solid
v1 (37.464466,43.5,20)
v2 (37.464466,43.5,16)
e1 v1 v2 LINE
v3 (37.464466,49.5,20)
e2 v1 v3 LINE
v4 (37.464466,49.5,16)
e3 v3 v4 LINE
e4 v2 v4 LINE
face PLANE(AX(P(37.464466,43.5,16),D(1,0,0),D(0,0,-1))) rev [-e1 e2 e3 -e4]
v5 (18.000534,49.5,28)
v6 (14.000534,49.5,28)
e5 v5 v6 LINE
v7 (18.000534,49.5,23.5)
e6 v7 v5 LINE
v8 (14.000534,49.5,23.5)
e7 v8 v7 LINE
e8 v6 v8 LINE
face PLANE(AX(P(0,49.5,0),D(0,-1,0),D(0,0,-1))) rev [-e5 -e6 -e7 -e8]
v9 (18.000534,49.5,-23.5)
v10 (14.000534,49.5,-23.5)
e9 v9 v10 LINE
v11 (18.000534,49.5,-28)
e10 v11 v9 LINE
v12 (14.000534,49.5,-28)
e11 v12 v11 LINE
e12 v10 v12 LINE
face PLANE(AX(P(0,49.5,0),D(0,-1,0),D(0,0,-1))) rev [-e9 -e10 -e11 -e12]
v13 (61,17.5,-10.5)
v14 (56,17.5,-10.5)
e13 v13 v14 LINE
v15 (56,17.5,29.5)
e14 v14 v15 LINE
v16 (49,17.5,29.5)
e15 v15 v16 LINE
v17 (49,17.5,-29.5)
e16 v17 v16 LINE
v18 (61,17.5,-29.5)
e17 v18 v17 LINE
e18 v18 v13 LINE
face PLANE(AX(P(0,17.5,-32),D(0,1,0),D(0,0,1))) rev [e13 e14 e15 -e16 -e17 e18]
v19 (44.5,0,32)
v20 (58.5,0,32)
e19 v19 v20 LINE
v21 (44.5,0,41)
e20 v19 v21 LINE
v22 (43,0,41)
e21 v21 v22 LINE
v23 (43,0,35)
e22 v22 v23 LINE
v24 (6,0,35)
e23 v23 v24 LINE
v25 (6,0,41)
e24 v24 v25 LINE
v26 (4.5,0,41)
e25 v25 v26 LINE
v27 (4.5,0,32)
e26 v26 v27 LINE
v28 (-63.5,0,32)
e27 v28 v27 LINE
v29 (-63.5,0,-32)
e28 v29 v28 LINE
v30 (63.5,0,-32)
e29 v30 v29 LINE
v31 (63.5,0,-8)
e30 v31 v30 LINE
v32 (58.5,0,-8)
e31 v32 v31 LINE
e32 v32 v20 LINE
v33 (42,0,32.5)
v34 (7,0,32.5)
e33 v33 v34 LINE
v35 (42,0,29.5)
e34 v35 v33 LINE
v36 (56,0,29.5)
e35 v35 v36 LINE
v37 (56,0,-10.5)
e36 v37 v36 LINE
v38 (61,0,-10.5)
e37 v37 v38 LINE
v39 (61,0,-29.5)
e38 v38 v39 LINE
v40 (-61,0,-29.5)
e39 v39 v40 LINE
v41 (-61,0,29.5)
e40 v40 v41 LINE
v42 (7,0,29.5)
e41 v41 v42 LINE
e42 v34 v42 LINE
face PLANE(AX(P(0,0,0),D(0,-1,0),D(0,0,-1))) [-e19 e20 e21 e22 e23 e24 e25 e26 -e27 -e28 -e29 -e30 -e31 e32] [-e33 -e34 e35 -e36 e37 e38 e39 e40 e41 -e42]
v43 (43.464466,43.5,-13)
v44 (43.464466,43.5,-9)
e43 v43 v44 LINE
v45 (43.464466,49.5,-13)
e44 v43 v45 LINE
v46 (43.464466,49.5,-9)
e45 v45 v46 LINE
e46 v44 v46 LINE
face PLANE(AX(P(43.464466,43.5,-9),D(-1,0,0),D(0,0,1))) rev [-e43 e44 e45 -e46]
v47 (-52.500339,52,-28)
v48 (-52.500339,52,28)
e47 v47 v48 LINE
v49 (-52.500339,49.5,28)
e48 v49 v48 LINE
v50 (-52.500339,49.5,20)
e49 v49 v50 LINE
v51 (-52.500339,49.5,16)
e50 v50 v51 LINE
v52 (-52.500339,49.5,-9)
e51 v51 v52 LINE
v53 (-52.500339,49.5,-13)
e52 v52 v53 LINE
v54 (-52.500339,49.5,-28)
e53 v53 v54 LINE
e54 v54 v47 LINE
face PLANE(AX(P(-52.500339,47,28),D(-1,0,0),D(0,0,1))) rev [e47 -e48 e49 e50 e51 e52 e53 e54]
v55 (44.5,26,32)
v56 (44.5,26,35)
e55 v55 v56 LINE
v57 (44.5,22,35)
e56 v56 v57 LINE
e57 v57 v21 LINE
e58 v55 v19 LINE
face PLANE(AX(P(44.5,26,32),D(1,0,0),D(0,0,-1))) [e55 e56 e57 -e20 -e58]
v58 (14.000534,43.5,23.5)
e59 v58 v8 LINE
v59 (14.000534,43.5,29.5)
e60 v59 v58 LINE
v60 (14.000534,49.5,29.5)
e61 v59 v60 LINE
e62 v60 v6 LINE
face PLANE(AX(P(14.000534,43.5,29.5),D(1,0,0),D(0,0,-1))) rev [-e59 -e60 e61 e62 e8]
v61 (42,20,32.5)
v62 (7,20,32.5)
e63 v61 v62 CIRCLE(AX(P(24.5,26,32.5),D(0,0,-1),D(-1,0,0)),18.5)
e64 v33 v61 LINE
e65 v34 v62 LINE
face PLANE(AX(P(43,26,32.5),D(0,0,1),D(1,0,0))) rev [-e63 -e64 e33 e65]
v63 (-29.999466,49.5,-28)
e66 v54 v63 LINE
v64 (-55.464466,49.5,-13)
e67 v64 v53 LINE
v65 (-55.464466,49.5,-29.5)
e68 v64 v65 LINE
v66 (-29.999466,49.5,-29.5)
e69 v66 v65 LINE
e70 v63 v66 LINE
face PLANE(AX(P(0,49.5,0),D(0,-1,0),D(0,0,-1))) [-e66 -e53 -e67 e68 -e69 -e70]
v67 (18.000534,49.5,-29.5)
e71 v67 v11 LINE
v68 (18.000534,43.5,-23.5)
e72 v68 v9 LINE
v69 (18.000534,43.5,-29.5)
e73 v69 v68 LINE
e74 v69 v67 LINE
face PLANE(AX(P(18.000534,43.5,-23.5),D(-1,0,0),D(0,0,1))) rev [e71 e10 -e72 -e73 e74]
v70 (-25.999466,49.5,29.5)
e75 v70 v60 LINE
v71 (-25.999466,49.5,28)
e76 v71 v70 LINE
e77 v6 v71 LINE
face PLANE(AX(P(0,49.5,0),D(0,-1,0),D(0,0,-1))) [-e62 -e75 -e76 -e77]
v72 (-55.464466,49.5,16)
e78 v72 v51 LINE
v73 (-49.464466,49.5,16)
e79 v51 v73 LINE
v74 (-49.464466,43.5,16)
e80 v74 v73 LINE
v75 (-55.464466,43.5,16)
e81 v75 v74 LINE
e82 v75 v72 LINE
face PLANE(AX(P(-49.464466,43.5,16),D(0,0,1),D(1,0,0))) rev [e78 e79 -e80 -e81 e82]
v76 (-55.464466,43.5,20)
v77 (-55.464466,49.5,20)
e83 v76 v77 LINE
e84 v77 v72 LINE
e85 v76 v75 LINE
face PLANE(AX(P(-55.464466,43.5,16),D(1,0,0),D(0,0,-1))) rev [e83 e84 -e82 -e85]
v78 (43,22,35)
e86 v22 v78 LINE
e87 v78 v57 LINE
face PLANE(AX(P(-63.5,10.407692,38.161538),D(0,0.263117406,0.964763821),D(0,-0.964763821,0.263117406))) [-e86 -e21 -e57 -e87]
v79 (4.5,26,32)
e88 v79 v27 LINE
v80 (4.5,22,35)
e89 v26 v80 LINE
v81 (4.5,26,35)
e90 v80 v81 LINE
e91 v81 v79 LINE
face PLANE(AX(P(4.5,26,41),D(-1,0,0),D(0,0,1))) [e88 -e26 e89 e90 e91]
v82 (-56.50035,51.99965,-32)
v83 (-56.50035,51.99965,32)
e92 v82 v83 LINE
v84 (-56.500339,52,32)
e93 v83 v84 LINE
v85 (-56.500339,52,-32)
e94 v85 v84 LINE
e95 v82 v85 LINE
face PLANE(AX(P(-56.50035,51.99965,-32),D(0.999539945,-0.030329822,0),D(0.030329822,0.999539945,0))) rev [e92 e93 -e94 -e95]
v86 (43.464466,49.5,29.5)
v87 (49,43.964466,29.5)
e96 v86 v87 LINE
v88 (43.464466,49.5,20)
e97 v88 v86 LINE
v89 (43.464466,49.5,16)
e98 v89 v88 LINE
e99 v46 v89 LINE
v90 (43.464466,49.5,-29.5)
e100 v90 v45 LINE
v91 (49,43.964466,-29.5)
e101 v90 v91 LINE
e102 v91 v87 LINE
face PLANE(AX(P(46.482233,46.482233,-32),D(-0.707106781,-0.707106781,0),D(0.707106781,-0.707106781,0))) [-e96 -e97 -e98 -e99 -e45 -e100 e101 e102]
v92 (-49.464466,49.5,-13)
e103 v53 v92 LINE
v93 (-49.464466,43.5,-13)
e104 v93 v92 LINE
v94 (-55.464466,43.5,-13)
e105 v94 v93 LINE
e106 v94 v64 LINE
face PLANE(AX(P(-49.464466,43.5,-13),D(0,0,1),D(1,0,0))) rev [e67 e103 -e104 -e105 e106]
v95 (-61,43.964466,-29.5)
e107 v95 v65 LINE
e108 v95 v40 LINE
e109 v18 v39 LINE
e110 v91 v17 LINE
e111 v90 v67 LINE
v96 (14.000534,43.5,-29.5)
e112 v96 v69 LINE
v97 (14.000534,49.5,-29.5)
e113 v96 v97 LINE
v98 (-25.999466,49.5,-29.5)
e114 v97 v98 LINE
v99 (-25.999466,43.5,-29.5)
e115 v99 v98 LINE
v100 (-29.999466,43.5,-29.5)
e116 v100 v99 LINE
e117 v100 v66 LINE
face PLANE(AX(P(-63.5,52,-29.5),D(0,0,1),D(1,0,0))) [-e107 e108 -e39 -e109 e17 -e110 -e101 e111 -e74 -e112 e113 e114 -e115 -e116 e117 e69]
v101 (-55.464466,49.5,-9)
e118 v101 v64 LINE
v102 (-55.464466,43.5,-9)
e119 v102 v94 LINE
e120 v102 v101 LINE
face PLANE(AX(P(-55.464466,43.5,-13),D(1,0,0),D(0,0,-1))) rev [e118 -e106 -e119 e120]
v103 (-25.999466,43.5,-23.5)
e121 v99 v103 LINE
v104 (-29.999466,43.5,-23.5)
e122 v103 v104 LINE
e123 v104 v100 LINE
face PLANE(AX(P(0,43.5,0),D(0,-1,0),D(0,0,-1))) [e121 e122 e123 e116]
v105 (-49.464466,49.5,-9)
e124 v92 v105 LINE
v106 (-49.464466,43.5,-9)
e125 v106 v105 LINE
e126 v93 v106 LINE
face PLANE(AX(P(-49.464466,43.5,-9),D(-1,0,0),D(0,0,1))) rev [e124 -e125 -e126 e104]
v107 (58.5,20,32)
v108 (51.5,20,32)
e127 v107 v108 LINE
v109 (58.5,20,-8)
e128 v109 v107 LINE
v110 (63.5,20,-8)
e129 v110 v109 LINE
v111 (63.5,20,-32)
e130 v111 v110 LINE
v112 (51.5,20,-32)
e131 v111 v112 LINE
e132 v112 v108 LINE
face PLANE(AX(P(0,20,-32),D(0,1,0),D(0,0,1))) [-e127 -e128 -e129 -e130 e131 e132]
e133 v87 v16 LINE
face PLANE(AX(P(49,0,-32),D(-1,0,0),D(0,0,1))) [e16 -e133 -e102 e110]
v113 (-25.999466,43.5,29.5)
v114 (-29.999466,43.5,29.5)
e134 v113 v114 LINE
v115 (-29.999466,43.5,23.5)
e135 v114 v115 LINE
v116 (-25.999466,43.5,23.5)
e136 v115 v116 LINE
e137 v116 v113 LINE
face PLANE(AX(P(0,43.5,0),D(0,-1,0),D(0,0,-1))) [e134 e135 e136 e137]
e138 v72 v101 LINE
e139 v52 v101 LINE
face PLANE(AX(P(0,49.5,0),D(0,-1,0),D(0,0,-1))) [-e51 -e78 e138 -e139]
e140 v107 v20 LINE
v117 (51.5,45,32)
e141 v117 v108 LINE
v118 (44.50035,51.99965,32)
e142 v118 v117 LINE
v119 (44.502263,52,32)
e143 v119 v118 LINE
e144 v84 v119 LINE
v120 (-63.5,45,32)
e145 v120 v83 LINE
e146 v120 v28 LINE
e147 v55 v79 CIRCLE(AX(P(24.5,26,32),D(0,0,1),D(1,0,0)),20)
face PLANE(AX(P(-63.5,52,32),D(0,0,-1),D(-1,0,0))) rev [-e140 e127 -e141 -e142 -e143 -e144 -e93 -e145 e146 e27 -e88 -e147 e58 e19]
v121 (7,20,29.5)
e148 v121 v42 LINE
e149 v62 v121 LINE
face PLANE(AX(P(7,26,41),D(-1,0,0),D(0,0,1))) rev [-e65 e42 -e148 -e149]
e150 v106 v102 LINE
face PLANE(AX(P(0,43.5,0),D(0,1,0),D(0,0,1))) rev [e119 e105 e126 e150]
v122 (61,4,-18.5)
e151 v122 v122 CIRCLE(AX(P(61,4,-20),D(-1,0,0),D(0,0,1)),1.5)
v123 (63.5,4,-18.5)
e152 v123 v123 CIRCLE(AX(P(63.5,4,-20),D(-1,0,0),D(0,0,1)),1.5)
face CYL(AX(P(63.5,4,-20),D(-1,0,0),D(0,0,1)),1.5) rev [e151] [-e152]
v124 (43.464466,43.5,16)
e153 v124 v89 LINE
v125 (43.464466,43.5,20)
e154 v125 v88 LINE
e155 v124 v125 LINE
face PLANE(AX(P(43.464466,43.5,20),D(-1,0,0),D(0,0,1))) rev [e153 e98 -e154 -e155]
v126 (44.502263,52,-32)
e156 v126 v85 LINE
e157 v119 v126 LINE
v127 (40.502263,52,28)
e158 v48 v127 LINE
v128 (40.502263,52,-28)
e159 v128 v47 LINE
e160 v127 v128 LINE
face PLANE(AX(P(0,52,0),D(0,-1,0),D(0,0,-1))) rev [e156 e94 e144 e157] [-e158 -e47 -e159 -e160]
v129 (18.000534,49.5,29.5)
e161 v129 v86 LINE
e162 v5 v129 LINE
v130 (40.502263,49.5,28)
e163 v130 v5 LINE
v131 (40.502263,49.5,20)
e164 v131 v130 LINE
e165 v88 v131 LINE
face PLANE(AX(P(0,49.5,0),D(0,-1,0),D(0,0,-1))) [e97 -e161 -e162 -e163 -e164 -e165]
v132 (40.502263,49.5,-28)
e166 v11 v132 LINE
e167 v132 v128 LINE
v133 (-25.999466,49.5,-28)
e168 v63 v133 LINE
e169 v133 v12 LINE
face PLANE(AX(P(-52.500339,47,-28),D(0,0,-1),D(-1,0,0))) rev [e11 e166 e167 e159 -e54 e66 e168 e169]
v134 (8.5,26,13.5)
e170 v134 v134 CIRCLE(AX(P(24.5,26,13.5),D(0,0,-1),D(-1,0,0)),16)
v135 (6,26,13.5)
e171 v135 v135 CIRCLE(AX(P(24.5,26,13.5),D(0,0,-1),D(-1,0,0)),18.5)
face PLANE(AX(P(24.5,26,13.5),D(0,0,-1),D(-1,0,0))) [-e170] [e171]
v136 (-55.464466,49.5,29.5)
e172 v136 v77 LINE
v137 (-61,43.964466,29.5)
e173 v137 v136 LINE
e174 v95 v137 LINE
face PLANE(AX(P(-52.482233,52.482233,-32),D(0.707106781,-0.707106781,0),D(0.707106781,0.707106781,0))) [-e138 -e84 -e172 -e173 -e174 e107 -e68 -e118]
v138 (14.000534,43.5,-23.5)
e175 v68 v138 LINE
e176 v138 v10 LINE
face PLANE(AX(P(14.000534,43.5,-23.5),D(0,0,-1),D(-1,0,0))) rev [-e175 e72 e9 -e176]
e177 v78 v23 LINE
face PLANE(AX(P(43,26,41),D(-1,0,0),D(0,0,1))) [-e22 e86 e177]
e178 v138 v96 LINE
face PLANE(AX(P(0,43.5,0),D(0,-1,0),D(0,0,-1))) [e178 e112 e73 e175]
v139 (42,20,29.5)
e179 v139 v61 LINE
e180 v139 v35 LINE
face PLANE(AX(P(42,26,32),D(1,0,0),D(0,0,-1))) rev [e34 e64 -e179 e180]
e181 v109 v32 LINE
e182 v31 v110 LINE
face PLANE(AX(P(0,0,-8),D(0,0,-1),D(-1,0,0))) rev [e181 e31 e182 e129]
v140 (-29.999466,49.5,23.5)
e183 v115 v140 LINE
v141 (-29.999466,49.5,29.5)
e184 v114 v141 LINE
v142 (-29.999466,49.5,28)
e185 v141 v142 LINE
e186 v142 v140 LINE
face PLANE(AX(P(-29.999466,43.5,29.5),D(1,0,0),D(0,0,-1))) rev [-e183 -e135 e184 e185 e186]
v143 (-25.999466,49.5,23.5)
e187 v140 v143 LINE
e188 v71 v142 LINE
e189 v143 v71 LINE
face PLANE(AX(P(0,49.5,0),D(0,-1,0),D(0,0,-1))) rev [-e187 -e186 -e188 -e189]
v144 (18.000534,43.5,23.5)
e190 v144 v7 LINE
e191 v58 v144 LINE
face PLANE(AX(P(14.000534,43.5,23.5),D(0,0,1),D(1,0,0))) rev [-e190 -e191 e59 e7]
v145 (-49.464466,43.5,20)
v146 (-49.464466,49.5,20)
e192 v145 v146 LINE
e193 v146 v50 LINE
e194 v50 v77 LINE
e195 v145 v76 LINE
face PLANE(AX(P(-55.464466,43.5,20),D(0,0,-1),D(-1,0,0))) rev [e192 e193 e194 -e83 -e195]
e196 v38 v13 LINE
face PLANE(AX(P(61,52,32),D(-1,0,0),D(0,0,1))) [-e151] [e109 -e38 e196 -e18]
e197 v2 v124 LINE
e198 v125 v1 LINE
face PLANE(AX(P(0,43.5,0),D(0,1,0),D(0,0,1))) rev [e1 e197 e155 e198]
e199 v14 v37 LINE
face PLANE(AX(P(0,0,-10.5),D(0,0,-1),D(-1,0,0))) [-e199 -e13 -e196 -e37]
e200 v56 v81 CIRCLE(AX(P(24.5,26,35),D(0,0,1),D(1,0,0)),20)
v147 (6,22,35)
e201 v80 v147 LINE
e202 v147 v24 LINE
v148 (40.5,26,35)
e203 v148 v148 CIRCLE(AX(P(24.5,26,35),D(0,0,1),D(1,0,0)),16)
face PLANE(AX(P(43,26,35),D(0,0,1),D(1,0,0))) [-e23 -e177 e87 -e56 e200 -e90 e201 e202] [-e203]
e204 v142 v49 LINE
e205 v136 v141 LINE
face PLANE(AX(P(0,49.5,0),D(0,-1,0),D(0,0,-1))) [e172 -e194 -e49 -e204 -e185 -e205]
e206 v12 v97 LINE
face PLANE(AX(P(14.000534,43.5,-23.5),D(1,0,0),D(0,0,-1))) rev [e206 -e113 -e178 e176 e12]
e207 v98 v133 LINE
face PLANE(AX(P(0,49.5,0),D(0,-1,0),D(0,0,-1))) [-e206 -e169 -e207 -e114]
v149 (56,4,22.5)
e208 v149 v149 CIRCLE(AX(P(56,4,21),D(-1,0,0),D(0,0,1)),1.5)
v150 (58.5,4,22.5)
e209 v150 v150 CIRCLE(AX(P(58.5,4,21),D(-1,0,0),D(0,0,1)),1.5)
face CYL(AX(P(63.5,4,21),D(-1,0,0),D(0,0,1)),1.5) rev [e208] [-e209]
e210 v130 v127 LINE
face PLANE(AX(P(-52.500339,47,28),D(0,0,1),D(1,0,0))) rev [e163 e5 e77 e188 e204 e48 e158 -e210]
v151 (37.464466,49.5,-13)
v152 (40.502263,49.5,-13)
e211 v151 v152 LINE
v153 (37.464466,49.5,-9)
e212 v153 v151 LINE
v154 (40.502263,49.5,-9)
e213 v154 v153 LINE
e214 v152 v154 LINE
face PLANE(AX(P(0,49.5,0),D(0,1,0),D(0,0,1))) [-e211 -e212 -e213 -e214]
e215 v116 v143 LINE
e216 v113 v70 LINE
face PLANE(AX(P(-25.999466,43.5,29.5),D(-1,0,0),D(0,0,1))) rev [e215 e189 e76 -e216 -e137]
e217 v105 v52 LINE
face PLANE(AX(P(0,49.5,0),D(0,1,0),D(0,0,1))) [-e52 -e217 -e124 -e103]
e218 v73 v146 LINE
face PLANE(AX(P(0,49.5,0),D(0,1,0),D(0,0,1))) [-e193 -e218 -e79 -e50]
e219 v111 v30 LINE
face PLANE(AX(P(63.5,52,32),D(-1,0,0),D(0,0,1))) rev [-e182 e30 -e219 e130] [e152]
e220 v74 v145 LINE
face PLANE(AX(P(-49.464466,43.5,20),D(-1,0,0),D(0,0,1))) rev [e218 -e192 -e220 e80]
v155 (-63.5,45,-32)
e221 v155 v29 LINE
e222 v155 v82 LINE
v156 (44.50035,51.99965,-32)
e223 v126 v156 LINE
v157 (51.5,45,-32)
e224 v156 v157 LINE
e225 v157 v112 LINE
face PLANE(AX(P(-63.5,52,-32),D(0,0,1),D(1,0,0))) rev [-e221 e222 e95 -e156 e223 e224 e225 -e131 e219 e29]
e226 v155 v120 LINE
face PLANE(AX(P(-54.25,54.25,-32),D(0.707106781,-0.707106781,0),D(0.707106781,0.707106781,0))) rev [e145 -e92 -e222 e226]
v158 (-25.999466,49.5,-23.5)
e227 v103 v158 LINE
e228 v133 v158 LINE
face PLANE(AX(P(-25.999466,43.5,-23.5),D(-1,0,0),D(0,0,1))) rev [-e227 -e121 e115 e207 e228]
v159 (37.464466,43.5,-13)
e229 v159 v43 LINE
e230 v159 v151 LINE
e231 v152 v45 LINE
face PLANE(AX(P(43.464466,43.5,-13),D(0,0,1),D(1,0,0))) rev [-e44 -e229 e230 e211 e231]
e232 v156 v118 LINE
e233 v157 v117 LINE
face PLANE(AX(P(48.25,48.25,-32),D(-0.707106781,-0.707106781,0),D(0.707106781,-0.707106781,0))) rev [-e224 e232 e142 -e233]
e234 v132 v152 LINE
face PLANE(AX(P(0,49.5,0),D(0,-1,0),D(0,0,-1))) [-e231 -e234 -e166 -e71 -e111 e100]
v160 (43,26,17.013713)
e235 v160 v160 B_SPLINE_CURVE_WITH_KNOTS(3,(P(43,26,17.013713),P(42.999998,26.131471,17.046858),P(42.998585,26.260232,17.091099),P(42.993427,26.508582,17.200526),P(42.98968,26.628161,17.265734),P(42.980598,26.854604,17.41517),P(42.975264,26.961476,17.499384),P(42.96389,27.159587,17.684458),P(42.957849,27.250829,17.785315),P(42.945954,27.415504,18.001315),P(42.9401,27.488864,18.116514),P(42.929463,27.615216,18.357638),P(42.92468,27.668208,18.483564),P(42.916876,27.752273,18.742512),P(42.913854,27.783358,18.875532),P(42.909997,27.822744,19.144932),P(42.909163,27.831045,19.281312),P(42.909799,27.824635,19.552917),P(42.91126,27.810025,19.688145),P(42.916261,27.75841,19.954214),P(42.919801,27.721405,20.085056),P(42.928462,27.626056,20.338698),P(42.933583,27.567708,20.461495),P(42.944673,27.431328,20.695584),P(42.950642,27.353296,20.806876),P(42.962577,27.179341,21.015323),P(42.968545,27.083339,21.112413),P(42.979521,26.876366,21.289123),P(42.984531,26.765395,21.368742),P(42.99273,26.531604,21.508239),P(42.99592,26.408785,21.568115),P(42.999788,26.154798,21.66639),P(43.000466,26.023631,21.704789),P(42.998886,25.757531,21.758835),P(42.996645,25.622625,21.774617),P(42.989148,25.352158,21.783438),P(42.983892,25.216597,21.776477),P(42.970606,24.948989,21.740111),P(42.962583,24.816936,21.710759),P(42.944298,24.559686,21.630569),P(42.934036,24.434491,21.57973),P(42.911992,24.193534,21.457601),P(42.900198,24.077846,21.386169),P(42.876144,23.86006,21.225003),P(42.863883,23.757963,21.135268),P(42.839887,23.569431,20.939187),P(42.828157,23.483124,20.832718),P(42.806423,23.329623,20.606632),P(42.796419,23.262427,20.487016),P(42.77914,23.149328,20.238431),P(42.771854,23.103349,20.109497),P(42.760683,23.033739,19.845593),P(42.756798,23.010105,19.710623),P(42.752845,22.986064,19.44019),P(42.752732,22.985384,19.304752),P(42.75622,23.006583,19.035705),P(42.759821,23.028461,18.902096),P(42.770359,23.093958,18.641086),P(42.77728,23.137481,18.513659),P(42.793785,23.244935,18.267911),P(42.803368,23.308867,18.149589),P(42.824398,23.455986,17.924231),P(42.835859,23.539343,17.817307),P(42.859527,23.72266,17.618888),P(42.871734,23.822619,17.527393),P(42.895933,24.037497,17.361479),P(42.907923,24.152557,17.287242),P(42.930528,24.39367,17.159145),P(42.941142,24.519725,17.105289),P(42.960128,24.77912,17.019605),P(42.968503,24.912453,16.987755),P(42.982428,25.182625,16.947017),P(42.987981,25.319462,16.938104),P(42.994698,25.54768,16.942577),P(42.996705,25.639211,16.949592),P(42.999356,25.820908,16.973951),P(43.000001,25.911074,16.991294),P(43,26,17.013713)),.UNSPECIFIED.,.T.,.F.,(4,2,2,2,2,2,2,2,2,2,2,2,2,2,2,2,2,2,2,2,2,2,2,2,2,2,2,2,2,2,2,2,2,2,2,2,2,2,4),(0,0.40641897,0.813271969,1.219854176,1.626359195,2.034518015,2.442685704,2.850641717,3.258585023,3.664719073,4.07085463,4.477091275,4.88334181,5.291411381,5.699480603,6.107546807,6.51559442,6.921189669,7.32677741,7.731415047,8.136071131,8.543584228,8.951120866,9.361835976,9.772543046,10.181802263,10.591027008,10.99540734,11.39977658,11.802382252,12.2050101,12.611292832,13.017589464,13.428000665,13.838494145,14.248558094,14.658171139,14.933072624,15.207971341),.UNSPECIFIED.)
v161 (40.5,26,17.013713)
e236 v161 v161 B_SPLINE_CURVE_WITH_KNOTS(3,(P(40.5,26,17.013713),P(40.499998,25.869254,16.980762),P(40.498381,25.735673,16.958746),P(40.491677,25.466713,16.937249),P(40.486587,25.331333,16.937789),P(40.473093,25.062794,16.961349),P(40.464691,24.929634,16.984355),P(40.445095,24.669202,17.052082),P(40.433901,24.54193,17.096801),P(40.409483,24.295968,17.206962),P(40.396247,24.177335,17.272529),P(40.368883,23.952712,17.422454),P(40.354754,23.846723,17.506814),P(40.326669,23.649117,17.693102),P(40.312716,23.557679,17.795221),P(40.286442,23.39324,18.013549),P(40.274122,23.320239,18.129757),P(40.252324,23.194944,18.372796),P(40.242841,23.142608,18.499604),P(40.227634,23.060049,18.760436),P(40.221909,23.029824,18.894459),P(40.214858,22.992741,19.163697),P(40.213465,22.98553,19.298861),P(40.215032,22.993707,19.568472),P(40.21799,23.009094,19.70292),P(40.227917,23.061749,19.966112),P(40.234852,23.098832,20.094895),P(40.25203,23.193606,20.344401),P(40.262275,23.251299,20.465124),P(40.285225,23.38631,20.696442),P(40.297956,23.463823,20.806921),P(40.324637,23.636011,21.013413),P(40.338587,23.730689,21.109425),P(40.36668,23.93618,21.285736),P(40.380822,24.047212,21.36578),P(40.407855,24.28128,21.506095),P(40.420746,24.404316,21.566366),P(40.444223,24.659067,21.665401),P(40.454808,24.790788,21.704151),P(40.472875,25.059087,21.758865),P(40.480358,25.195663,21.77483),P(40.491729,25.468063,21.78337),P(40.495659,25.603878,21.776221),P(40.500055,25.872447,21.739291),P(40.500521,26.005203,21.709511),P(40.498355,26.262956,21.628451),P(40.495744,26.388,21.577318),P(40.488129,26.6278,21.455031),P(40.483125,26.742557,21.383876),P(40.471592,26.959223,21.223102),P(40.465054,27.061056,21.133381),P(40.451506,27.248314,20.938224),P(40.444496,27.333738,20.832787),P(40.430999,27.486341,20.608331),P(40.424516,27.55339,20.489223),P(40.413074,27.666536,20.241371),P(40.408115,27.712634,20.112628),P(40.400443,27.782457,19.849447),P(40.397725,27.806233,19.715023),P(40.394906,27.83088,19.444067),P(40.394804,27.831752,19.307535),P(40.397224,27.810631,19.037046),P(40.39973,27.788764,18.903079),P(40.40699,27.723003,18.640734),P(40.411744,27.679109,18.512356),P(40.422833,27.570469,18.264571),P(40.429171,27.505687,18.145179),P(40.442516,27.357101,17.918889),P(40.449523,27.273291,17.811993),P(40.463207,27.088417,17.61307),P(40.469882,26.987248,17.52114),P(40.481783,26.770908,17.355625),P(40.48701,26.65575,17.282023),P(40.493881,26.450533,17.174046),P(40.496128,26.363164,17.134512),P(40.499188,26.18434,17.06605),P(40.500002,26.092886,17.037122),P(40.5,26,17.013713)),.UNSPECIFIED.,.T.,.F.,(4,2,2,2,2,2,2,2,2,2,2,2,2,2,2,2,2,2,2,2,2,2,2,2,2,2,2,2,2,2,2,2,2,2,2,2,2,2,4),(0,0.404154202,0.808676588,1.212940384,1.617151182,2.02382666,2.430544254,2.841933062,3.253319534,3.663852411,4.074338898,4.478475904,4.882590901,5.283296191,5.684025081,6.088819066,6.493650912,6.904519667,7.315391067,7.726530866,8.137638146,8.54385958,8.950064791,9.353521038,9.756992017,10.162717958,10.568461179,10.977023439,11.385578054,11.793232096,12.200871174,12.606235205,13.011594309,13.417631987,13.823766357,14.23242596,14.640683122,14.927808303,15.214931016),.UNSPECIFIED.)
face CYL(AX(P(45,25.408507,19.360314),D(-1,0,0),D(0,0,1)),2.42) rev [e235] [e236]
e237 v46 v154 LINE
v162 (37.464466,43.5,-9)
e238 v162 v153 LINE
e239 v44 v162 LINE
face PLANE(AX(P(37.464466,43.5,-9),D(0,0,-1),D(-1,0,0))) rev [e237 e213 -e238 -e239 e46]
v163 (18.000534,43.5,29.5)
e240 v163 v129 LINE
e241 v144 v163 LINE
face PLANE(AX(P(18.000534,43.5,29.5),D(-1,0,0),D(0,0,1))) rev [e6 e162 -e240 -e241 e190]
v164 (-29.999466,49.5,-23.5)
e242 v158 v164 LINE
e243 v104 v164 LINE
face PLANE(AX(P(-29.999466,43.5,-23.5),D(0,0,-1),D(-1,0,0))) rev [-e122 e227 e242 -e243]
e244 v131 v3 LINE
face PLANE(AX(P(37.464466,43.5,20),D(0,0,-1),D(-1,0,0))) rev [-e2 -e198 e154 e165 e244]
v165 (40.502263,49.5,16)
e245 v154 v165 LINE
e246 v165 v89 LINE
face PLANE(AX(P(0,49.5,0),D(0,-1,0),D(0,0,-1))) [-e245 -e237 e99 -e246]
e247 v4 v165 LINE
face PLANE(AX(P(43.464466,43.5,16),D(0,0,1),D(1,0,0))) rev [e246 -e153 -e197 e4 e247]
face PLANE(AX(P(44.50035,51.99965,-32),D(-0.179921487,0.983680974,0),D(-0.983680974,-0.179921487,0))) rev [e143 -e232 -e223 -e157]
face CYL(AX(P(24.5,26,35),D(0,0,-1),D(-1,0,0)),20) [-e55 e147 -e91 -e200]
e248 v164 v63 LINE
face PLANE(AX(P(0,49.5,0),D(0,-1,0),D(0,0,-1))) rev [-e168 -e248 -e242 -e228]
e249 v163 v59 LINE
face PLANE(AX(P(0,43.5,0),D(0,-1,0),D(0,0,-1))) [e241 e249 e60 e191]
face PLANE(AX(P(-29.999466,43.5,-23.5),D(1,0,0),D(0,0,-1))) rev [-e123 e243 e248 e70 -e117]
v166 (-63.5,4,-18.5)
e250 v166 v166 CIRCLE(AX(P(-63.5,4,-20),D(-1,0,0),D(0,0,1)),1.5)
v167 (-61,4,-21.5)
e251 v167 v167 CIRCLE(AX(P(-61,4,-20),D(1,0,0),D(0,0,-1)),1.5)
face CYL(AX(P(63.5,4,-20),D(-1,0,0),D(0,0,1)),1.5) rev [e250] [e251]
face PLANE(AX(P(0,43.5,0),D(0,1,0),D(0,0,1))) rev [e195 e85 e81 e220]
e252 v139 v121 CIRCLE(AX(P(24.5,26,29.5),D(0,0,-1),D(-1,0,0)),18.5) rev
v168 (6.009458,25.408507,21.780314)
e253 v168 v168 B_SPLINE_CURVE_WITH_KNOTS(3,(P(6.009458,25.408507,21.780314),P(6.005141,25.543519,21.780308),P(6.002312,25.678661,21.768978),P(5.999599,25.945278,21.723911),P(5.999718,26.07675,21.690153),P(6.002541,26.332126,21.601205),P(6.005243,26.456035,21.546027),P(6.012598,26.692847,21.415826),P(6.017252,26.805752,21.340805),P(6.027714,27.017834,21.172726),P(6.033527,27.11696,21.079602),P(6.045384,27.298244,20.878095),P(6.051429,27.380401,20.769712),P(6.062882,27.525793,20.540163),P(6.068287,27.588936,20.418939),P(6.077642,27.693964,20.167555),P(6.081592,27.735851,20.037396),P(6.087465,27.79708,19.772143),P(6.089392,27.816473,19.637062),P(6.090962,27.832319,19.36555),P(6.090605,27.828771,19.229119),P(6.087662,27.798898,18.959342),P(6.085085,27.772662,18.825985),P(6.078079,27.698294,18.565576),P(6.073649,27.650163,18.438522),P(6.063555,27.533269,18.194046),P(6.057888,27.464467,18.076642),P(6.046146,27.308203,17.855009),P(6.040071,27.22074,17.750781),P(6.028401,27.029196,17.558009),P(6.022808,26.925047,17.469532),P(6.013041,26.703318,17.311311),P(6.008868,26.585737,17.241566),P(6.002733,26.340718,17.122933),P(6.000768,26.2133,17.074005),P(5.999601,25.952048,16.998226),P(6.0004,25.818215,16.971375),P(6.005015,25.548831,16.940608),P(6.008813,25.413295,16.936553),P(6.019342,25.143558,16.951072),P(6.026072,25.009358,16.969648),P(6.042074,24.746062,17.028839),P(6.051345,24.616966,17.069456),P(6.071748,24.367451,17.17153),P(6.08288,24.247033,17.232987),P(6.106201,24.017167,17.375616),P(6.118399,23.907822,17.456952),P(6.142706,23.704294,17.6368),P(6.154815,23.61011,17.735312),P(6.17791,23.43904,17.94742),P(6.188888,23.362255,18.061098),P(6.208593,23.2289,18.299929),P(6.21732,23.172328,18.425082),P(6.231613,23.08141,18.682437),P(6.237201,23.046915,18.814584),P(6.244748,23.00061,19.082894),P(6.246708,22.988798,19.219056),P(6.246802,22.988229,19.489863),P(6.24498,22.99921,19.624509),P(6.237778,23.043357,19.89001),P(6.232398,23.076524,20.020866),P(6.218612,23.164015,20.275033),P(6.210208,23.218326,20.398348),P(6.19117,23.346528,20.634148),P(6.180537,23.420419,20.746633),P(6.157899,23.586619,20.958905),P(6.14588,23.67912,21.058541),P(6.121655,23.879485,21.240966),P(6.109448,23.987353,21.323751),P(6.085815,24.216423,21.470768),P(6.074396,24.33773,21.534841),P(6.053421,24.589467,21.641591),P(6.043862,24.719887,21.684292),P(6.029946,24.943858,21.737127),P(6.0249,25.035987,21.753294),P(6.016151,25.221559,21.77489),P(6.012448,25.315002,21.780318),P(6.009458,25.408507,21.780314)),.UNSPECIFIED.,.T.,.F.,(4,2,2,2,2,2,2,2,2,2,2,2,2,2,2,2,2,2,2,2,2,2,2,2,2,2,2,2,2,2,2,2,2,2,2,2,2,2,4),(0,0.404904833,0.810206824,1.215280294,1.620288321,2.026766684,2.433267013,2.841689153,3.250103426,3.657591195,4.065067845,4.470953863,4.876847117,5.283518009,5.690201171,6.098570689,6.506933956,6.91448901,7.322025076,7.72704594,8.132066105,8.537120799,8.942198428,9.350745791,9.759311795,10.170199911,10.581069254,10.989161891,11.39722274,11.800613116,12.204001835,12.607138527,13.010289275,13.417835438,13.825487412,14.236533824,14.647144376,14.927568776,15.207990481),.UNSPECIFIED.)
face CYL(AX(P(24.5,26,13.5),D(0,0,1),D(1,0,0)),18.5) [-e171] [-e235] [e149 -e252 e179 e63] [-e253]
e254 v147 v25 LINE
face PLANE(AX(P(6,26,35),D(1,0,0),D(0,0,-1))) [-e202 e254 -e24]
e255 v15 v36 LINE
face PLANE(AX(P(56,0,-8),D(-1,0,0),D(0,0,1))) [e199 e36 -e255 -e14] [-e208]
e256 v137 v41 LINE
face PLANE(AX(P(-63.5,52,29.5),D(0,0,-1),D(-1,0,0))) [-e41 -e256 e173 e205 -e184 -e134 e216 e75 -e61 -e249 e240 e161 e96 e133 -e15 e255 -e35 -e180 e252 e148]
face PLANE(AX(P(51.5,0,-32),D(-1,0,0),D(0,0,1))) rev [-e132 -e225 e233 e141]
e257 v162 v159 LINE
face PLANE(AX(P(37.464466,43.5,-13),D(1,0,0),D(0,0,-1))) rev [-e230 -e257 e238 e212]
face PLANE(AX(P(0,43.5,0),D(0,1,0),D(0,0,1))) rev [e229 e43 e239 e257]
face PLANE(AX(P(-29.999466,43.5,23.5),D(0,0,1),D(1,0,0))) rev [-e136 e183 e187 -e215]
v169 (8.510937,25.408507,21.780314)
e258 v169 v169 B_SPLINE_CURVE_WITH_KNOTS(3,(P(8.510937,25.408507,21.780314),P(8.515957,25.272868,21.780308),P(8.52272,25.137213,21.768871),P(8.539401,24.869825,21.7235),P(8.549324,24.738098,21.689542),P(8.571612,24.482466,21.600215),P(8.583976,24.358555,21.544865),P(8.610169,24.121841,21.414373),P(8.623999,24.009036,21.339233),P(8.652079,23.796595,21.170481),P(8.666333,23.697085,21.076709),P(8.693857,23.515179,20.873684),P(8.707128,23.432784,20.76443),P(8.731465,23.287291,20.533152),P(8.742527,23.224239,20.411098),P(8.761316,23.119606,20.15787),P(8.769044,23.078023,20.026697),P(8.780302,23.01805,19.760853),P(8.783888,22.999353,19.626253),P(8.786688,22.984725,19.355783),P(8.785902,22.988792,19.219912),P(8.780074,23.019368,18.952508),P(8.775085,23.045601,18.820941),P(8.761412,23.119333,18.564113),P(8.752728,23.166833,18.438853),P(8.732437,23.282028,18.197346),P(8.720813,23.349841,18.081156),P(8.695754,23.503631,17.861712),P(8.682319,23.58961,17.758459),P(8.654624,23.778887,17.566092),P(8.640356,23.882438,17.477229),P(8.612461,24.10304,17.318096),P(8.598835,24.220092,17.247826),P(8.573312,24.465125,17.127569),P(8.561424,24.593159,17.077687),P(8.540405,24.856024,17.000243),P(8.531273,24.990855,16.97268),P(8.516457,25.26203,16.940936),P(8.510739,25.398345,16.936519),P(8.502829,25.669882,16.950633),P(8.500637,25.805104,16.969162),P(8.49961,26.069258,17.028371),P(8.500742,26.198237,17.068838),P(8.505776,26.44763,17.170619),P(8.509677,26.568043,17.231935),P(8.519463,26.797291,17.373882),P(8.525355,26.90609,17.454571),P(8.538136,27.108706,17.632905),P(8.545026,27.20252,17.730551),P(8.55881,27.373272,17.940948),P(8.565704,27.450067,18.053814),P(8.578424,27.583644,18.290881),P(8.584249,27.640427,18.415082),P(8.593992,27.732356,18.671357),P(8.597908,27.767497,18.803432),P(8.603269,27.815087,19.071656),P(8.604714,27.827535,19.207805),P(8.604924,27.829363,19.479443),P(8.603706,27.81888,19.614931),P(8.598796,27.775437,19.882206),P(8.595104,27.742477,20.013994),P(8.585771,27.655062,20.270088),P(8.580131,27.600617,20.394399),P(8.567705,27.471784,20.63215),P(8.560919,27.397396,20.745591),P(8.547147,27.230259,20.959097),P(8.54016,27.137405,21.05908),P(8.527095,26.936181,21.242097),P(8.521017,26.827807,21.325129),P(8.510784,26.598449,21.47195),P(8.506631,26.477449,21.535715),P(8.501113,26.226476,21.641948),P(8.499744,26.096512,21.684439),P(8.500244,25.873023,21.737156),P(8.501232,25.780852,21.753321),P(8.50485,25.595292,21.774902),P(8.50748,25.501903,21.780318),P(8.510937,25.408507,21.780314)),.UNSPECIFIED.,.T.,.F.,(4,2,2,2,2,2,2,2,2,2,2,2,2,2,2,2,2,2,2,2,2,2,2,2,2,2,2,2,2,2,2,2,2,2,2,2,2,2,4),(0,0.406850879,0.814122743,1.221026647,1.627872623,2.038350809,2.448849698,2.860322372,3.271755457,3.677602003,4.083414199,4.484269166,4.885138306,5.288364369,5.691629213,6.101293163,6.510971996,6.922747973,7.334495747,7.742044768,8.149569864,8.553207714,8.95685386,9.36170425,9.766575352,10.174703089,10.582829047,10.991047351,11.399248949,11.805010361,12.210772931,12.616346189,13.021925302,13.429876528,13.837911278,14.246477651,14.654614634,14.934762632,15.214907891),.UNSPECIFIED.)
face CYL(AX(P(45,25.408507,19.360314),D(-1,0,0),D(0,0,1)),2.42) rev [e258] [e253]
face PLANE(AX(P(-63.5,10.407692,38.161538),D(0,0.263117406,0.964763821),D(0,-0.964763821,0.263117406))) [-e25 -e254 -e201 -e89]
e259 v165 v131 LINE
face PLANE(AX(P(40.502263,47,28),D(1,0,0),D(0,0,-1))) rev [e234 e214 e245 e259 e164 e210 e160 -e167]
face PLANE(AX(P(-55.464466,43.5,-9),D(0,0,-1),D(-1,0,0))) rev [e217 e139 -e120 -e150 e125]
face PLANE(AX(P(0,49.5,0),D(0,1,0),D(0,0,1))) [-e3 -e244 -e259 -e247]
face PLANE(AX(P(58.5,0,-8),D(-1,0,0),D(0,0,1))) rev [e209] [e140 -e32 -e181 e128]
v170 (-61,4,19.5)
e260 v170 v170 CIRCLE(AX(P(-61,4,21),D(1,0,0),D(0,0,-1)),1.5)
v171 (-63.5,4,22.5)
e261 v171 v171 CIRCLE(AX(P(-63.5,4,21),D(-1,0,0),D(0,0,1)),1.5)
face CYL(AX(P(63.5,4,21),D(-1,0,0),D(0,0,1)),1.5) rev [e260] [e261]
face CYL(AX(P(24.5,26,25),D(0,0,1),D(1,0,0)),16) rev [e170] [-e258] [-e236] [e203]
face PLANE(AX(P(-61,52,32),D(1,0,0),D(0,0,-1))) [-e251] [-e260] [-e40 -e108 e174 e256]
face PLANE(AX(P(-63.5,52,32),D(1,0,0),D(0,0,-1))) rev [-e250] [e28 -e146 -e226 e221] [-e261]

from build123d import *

# Parameters (mm, degrees)
CROQUIS1_W              = 127
CROQUIS1_H              = 64
SALIENTE_EXTRUIR1_DEPTH = 52
CORTAR_EXTRUIR1_DEPTH   = 105.078095678
CORTAR_EXTRUIR2_DEPTH   = 105.078095678
CROQUIS4_W              = 5
CROQUIS4_H              = 20
CORTAR_EXTRUIR3_DEPTH   = 40
SALIENTE_EXTRUIR2_DEPTH = 26
VACIADO1_START          = -29.5
VACIADO1_DEPTH          = 59
VACIADO1_START_2        = 29.5
VACIADO1_2_OUTLINE_W    = 35
VACIADO1_2_OUTLINE_H    = 23.5
VACIADO1_2_DEPTH        = 3
VACIADO1_3_OUTLINE_W    = 5
VACIADO1_3_OUTLINE_H    = 17.5
VACIADO1_3_DEPTH        = 19
CORTAR_EXTRUIR4_DEPTH   = 127.684647847
SALIENTE_EXTRUIR3_DEPTH = 3
CROQUIS8_R              = 16
CORTAR_EXTRUIR5_DEPTH   = 10
CROQUIS9_R              = 18.5
CROQUIS9_R_2            = 16
SALIENTE_EXTRUIR4_DEPTH = 19
CROQUIS11_R             = 2.42
CORTAR_EXTRUIR6_DEPTH   = 39
CROQUIS12_W             = 93.002602727
CROQUIS12_H             = 56
CORTAR_EXTRUIR8_DEPTH   = 5
CROQUIS13_W             = 4
CROQUIS13_H             = 6
CROQUIS13_W_2           = 6
CROQUIS13_H_2           = 4
SALIENTE_EXTRUIR5_DEPTH = 6
CROQUIS14_R             = 1.5
CORTAR_EXTRUIR9_DEPTH   = 144.227092409


# Read off the part's stored shape, not the designer's step: Vaciado1
with BuildPart() as part:
    # Croquis1 → Saliente-Extruir1 (new body)
    with BuildSketch(Plane(origin=(0, 0, 0), x_dir=(1, 0, 0), z_dir=(0, 1, 0))):
        Rectangle(CROQUIS1_W, CROQUIS1_H)
    extrude(amount=SALIENTE_EXTRUIR1_DEPTH)

    # Croquis2 → Cortar-Extruir1 (cut, through all)
    with BuildSketch(Plane.XY.offset(32)):
        Polygon((-63.5, 52), (-63.5, 45), (-56.500349973, 51.999650027), align=None)
        Polygon((51.5, 20), (63.5, 20), (63.5, 52), (44.500349973, 51.999650027), (51.5, 45), align=None)
    extrude(amount=-CORTAR_EXTRUIR1_DEPTH, mode=Mode.SUBTRACT)

    # Croquis3 → Cortar-Extruir2 (cut, through all)
    with BuildSketch(Plane.XY.offset(32)):
        Polygon((-56.500349973, 51.999650027), (-56.487592612, 52.42007755), (-63.863183818, 52.643880882), (-63.863183818, 51.396655122), (-58.40187656, 51.777539568), align=None)
        Polygon((44.500349973, 51.999650027), (64.754794762, 55.7043164), (64.754794762, 48.499825013), align=None)
    extrude(amount=-CORTAR_EXTRUIR2_DEPTH, mode=Mode.SUBTRACT)

    # Croquis4 → Cortar-Extruir3 (cut)
    with BuildSketch(Plane.XY.offset(32)):
        with Locations((61, 10)):
            Rectangle(CROQUIS4_W, CROQUIS4_H)
    extrude(amount=-CORTAR_EXTRUIR3_DEPTH, mode=Mode.SUBTRACT)

    # Croquis5 → Saliente-Extruir2 (add)
    with BuildSketch(Plane.XZ):
        Polygon((44.5, 32), (44.5, 41), (43, 41), (43, 35), (6, 35), (6, 41), (4.5, 41), (4.5, 32), align=None)
    extrude(amount=-SALIENTE_EXTRUIR2_DEPTH)

    # Vaciado1 outline → Vaciado1 (cut)
    with BuildSketch(Plane.XY.offset(VACIADO1_START)):
        Polygon((56, 0), (56, 17.5), (49, 17.5), (49, 43.964466094), (43.464466094, 49.5), (-55.464466094, 49.5), (-61, 43.964466094), (-61, 0), align=None)
    extrude(amount=VACIADO1_DEPTH, mode=Mode.SUBTRACT)

    # Vaciado1 2 outline → Vaciado1 2 (cut)
    with BuildSketch(Plane.XY.offset(VACIADO1_START_2)):
        with Locations((24.5, 11.75)):
            Rectangle(VACIADO1_2_OUTLINE_W, VACIADO1_2_OUTLINE_H)
    extrude(amount=VACIADO1_2_DEPTH, mode=Mode.SUBTRACT)

    # Vaciado1 3 outline → Vaciado1 3 (cut)
    with BuildSketch(Plane.XY.offset(VACIADO1_START)):
        with Locations((58.5, 8.75)):
            Rectangle(VACIADO1_3_OUTLINE_W, VACIADO1_3_OUTLINE_H)
    extrude(amount=VACIADO1_3_DEPTH, mode=Mode.SUBTRACT)

    # Croquis6 → Cortar-Extruir4 (cut, through all)
    with BuildSketch(Plane(origin=(44.5, 0, 0), x_dir=(0, 0, -1), z_dir=(1, 0, 0))):
        Polygon((-41, 0), (-35, 22), (-35, 26), (-41, 26), align=None)
    extrude(amount=-CORTAR_EXTRUIR4_DEPTH, mode=Mode.SUBTRACT)

    # Croquis7 → Saliente-Extruir3 (add)
    with BuildSketch(Plane.XY.offset(32)):
        with BuildLine():
            Line((4.5, 26), (44.5, 26))
            ThreePointArc((44.5, 26), (24.5, 46), (4.5, 26))
        make_face()
    extrude(amount=SALIENTE_EXTRUIR3_DEPTH)

    # Croquis8 → Cortar-Extruir5 (cut)
    with BuildSketch(Plane.XY.offset(35)):
        with Locations((24.5, 26)):
            Circle(CROQUIS8_R)
    extrude(amount=-CORTAR_EXTRUIR5_DEPTH, mode=Mode.SUBTRACT)

    # Croquis9 → Saliente-Extruir4 (add)
    with BuildSketch(Plane(origin=(0, 0, 32.5), x_dir=(-1, 0, 0), z_dir=(0, 0, -1))):
        with Locations(Location((-24.5, 26, 0), (0, 0, 198.924644416))):
            Circle(CROQUIS9_R)
        with Locations(Location((-24.5, 26, 0), (0, 0, 180))):
            Circle(CROQUIS9_R_2, mode=Mode.SUBTRACT)
    extrude(amount=SALIENTE_EXTRUIR4_DEPTH)

    # Croquis11 → Cortar-Extruir6 (cut)
    with BuildSketch(Plane(origin=(6, 0, 0), x_dir=(0, 0, -1), z_dir=(1, 0, 0))):
        with Locations(Location((-19.360313857, 25.408506724, 0), (0, 0, 180))):
            Circle(CROQUIS11_R)
    extrude(amount=CORTAR_EXTRUIR6_DEPTH, mode=Mode.SUBTRACT)

    # Croquis12 → Cortar-Extruir8 (cut)
    with BuildSketch(Plane(origin=(0, 52, 0), x_dir=(1, 0, 0), z_dir=(0, 1, 0))):
        with Locations((-5.99903799, 0)):
            Rectangle(CROQUIS12_W, CROQUIS12_H)
    extrude(amount=-CORTAR_EXTRUIR8_DEPTH, mode=Mode.SUBTRACT)

    # Croquis13 → Saliente-Extruir5 (add)
    with BuildSketch(Plane.XZ.offset(-49.5)):
        with Locations((-27.999466094, 26.5)):
            Rectangle(CROQUIS13_W, CROQUIS13_H)
        with Locations((16.000533906, 26.5)):
            Rectangle(CROQUIS13_W, CROQUIS13_H)
        with Locations((16.000533906, -26.5)):
            Rectangle(CROQUIS13_W, CROQUIS13_H)
        with Locations((-27.999466094, -26.5)):
            Rectangle(CROQUIS13_W, CROQUIS13_H)
        with Locations((-52.464466094, 18)):
            Rectangle(CROQUIS13_W_2, CROQUIS13_H_2)
        with Locations((40.464466094, 18)):
            Rectangle(CROQUIS13_W_2, CROQUIS13_H_2)
        with Locations((40.464466094, -11)):
            Rectangle(CROQUIS13_W_2, CROQUIS13_H_2)
        with Locations((-52.464466094, -11)):
            Rectangle(CROQUIS13_W_2, CROQUIS13_H_2)
    extrude(amount=SALIENTE_EXTRUIR5_DEPTH)

    # Croquis14 → Cortar-Extruir9 (cut, through all)
    with BuildSketch(Plane.ZY.offset(63.5)):
        with Locations((-20, 4)):
            Circle(CROQUIS14_R)
        with Locations((21, 4)):
            Circle(CROQUIS14_R)
    extrude(amount=-CORTAR_EXTRUIR9_DEPTH, mode=Mode.SUBTRACT)


solid = part.part
